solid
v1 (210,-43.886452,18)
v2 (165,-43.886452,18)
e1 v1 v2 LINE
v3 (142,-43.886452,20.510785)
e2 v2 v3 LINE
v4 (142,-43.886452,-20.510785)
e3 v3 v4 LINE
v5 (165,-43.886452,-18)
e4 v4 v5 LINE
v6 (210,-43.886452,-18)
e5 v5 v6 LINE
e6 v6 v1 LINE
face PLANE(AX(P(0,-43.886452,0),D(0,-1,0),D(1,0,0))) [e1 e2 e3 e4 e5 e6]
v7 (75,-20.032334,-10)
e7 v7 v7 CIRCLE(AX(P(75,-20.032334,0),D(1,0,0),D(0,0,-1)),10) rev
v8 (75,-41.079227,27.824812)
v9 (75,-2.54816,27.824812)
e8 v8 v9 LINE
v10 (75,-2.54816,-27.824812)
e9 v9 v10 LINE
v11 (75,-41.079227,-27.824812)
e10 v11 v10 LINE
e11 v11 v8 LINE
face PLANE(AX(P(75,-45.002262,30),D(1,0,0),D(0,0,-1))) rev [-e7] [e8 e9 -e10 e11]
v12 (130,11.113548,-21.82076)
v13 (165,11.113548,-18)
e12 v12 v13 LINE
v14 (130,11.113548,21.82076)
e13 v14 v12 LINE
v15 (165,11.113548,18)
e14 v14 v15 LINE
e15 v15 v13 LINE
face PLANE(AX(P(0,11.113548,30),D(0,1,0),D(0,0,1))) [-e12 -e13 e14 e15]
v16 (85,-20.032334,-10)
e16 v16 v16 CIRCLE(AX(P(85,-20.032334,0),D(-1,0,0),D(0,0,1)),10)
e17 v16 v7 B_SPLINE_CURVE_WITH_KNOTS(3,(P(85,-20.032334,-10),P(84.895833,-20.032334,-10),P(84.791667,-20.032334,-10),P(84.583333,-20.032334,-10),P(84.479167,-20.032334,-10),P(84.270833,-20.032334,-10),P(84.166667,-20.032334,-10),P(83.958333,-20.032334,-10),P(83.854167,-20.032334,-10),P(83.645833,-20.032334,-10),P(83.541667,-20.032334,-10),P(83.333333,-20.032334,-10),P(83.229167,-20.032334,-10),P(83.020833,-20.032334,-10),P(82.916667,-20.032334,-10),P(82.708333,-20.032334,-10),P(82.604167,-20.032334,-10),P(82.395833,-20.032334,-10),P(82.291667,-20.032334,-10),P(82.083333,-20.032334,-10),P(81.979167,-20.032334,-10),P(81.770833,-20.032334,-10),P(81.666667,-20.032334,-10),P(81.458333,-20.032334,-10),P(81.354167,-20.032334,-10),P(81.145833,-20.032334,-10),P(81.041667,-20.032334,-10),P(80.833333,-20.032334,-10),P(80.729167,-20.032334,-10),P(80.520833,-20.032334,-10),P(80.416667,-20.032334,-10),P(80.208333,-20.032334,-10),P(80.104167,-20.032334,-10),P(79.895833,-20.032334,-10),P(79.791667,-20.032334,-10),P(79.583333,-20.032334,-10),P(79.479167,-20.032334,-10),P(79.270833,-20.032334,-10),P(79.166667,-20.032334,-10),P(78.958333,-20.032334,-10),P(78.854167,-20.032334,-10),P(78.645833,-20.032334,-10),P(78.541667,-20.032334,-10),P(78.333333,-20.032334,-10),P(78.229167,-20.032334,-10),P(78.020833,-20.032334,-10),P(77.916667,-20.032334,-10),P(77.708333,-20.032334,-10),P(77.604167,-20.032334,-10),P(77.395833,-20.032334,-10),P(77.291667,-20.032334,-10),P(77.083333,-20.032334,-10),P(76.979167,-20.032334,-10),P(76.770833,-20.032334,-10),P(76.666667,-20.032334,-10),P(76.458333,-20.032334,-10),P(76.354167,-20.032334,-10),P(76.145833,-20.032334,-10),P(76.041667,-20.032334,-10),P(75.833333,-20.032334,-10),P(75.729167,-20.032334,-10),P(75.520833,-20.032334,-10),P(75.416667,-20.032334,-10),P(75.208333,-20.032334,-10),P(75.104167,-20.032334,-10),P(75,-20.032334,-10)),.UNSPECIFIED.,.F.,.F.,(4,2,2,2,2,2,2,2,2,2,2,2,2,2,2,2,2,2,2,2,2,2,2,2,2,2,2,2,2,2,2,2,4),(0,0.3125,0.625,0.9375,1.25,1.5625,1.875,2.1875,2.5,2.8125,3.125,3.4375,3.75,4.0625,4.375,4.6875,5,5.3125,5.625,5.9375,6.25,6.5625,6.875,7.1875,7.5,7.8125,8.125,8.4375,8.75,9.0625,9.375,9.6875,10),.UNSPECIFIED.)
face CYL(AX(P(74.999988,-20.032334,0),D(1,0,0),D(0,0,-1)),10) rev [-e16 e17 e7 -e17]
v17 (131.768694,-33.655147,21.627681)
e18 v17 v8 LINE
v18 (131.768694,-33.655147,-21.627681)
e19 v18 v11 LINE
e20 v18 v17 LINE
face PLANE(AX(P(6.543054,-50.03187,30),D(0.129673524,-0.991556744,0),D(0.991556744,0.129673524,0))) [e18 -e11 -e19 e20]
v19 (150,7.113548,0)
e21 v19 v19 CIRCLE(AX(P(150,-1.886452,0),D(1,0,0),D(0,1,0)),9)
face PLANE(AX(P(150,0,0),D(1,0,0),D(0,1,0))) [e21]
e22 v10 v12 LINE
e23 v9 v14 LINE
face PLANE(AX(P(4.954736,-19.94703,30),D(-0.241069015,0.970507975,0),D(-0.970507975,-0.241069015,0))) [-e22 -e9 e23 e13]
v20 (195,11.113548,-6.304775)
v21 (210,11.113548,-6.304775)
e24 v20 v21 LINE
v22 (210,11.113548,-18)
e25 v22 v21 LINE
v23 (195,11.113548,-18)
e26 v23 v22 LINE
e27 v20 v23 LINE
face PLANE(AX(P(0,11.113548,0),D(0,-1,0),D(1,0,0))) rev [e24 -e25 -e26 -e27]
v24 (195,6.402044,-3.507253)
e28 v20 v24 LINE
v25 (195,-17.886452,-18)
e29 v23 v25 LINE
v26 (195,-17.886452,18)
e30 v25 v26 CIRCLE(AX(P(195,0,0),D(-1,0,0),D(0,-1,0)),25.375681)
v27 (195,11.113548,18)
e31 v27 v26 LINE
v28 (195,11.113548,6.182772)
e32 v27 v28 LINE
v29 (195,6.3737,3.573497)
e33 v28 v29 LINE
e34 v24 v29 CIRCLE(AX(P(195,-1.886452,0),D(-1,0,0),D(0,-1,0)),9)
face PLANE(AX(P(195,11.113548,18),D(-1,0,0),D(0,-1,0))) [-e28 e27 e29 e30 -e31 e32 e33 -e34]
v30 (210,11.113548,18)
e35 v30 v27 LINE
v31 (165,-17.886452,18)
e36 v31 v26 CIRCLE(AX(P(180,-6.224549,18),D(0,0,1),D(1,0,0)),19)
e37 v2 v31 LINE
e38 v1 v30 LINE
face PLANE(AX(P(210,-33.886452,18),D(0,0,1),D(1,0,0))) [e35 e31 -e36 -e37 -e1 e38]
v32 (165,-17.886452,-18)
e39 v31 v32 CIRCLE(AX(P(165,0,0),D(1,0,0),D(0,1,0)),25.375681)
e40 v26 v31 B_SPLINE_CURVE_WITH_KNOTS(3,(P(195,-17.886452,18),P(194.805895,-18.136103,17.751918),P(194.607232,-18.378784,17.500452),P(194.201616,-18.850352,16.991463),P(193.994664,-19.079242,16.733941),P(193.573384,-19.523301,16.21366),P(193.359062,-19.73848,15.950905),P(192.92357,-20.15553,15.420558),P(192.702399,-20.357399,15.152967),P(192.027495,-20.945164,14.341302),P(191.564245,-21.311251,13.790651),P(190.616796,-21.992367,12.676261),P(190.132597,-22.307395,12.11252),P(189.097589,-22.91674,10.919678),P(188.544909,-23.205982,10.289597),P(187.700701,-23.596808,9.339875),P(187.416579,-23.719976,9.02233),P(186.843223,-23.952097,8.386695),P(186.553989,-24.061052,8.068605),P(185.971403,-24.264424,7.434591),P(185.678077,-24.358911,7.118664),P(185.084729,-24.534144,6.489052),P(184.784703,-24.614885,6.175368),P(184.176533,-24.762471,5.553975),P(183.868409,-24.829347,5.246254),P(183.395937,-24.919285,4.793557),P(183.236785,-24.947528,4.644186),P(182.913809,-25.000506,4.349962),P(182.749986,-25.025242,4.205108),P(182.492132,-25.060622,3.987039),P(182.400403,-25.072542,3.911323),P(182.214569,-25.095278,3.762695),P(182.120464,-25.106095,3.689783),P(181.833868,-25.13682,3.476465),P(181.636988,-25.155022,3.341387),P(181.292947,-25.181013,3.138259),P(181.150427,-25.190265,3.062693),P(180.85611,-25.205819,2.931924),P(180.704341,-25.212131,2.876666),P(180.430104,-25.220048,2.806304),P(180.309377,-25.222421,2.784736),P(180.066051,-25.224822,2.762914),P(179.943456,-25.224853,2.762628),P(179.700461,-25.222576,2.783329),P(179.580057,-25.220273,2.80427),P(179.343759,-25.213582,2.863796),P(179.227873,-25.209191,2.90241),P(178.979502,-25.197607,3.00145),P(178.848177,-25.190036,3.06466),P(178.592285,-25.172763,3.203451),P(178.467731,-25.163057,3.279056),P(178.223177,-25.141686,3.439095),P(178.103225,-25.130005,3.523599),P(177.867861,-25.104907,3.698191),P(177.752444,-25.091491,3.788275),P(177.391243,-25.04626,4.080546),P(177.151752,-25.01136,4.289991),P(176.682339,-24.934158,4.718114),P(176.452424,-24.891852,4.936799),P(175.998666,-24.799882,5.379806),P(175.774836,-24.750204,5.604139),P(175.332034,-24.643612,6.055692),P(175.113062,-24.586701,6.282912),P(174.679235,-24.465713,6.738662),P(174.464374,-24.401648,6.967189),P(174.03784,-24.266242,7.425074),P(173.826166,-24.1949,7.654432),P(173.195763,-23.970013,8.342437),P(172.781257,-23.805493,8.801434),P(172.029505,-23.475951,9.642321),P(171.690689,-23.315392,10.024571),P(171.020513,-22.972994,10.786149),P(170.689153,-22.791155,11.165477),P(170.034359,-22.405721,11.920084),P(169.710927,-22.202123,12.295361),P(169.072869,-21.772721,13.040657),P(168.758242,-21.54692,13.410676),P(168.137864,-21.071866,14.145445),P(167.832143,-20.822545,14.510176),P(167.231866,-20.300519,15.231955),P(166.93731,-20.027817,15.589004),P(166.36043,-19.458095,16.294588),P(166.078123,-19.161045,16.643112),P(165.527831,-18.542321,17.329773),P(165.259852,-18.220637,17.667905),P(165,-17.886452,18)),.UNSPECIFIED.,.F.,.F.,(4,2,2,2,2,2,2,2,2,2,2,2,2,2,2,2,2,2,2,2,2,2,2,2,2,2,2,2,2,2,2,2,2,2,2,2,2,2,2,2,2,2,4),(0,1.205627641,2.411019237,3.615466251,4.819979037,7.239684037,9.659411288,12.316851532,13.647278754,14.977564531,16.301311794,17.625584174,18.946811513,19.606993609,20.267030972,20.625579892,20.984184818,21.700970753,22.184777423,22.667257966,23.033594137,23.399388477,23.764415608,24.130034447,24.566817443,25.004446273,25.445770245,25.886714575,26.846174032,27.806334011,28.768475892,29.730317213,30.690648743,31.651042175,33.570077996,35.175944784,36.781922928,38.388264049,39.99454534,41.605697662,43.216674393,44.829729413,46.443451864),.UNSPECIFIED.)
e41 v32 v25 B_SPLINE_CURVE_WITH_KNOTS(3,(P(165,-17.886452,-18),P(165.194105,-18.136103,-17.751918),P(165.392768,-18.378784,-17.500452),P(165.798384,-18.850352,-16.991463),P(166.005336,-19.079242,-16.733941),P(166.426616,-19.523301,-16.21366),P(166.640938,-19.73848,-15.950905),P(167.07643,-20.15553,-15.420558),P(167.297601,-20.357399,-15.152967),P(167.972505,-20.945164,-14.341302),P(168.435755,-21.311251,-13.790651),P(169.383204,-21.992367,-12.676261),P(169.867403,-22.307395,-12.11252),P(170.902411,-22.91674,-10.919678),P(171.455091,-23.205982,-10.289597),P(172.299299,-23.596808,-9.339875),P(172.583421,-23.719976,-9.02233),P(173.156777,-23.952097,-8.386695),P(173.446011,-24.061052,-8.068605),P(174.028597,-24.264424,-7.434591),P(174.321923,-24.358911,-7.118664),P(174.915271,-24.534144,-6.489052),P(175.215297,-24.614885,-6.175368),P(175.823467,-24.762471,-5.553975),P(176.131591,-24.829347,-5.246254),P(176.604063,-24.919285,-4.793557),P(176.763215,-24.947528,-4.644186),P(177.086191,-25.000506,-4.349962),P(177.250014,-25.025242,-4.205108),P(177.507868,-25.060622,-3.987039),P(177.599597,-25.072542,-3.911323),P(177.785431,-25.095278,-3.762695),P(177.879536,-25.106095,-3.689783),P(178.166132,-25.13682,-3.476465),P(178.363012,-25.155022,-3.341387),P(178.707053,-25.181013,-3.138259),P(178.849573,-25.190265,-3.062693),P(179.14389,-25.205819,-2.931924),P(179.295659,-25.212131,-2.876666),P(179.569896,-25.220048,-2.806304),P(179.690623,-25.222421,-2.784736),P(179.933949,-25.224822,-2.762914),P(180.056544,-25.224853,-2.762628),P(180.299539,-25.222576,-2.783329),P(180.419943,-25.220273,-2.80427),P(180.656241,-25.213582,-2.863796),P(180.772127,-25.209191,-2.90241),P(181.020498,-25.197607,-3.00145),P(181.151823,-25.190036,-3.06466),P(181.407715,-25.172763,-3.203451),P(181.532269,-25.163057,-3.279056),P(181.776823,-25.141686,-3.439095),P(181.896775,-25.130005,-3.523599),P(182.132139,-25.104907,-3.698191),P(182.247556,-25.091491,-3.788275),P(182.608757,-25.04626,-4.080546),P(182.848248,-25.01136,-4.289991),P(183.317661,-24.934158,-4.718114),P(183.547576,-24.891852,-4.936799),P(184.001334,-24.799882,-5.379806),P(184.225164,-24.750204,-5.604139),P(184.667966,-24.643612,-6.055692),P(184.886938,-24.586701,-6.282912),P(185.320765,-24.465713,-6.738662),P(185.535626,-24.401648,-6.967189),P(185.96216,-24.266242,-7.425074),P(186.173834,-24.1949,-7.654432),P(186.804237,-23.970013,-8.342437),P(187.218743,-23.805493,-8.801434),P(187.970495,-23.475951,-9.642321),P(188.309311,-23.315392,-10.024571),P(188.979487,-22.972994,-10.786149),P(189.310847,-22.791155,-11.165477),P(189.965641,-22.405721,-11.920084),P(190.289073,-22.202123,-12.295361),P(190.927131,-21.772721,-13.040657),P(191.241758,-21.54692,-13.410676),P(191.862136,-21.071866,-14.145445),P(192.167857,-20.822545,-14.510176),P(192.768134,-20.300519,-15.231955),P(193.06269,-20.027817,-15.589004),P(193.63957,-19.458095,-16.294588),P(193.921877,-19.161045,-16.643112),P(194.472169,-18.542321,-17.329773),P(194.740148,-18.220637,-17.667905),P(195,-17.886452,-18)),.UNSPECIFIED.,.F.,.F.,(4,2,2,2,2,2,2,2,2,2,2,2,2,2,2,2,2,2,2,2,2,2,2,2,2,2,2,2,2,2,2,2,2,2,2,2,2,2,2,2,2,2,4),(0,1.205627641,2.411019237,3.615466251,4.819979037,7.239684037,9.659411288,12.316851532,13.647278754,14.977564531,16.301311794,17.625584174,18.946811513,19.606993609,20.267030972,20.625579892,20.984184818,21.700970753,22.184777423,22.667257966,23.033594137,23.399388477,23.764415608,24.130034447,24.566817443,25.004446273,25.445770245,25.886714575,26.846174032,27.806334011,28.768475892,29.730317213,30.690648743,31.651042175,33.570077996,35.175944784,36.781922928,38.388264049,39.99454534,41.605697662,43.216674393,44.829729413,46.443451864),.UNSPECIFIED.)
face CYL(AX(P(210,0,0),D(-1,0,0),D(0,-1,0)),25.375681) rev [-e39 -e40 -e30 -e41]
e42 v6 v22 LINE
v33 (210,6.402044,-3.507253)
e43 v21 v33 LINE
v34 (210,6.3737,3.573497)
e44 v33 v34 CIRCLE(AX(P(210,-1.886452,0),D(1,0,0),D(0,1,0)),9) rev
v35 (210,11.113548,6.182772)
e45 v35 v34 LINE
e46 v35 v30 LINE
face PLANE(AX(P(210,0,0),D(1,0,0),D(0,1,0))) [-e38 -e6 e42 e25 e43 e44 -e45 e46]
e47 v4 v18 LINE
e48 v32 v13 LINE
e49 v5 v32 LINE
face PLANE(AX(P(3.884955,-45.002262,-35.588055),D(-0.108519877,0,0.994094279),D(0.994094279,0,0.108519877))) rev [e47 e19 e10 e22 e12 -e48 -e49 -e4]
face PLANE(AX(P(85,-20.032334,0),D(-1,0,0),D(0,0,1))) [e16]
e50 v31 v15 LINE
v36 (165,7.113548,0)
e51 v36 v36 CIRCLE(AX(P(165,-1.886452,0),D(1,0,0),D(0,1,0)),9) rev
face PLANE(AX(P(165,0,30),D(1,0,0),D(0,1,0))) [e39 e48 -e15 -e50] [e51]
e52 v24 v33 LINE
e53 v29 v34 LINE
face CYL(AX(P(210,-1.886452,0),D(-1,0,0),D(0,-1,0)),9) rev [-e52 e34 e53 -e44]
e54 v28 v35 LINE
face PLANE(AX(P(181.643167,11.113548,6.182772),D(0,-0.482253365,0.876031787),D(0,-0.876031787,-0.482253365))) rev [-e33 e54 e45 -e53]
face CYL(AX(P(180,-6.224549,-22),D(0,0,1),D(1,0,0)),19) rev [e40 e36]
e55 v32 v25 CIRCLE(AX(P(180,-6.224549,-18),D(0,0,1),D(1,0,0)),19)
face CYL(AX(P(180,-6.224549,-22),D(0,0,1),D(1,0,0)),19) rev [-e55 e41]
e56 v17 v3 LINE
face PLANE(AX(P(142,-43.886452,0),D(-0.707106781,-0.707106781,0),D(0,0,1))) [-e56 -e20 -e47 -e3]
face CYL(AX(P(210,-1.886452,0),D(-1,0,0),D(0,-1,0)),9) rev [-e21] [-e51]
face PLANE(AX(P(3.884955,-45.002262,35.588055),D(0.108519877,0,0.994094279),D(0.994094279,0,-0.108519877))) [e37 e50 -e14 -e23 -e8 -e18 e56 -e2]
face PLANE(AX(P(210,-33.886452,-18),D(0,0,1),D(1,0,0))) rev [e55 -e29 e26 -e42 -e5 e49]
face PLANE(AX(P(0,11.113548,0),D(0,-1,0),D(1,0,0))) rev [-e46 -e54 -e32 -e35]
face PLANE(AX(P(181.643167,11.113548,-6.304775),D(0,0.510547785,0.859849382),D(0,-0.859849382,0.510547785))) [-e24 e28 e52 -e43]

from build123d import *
from OCP.BRepAlgoAPI import BRepAlgoAPI_Cut
from OCP.TopTools import TopTools_ListOfShape

# Parameters (mm, degrees)
SKETCH1_R               = 10
BOSS_EXTRUDE2_DEPTH     = 30
SKETCH4_R               = 10
CUT_EXTRUDE1_DEPTH      = 15
CHAMFER1_SIZE           = 20
CUT_EXTRUDE2_DEPTH      = 174.638139858
CUT_EXTRUDE2_DEPTH_BACK = 174.638139858
BOSS_EXTRUDE3_DEPTH     = 45
CUT_EXTRUDE3_DEPTH      = 198.547978004
CUT_EXTRUDE3_DEPTH_BACK = 15
SKETCH6_3_R             = 9
SKETCH8_W               = 15
SKETCH8_H               = 36
BOSS_EXTRUDE4_DEPTH     = 45.000002
SKETCH10_R              = 9
CUT_EXTRUDE4_DEPTH      = 198.547978004
BOSS_EXTRUDE5_DEPTH     = 10
CHAMFER2_SIZE           = 12
CUT_EXTRUDE5_DEPTH      = 40
CUT_EXTRUDE6_DEPTH      = 217.852953896
CUT_EXTRUDE6_DEPTH_BACK = 217.852953896
SKETCH14_W              = 100
SKETCH14_H              = 60
CUT_EXTRUDE7_DEPTH      = 145.655593904
CUT_EXTRUDE7_DEPTH_BACK = 10
SKETCH16_R              = 10
CUT_EXTRUDE8_DEPTH      = 15


# Some blends are built 0.0001 mm under size
with BuildPart() as part:
    # Sketch1 → Boss-Extrude2 (new, symmetric)
    # profile 1 of 3: a face of its own
    with BuildSketch(Plane.XY):
        Polygon((25, -10), (-4.997737685, -45.002262315), (-25, -25), (-25, 25), (25, 25), align=None)
        Circle(SKETCH1_R, mode=Mode.SUBTRACT)
    # profile 2 of 3: a face of its own
    with BuildSketch(Plane.XY):
        Polygon((45, -10), (25, -10), (-4.997737685, -45.002262315), (45.002262315, -45.002262315), (75, -41.079226753), (75, -2.548159698), align=None)
    # profile 3 of 3: a face of its own
    with BuildSketch(Plane.XY):
        Polygon((130, 11.113547523), (75, -2.548159698), (75, -41.079226753), (130, -33.886452477), (165, -33.886452477), (165, 11.113547523), align=None)
    extrude(amount=BOSS_EXTRUDE2_DEPTH, both=True)

    # Sketch4 → Cut-Extrude1 (cut, symmetric)
    with BuildSketch(Plane.XY):
        Polygon((25, -10), (-4.997737685, -45.002262315), (-25, -25), (-25, 25), (25, 25), align=None)
        Circle(SKETCH4_R, mode=Mode.SUBTRACT)
    extrude(amount=CUT_EXTRUDE1_DEPTH, both=True, mode=Mode.SUBTRACT)

    # Chamfer1
    chamfer1_edges = [part.edges().sort_by_distance(p)[0] for p in [
        (25, -10, -22.5),
        (25, -10, 22.5),
    ]]
    chamfer(chamfer1_edges, length=CHAMFER1_SIZE - 0.0001)  # a hair under: the kernel refuses the full size

    # Sketch5 → Cut-Extrude2 (cut, two sides: drawn at the far end of the back side and taken through both)
    with BuildSketch(Plane(origin=(0, 0, 0), x_dir=(1, 0, 0), z_dir=(0, 1, 0)).offset(-CUT_EXTRUDE2_DEPTH_BACK)):
        Polygon((165, -30), (165, -18), (55.074227224, -30), align=None)
        Polygon((165, 18), (165, 30), (55.074227224, 30), align=None)
    extrude(amount=CUT_EXTRUDE2_DEPTH + CUT_EXTRUDE2_DEPTH_BACK, mode=Mode.SUBTRACT)

    # Sketch6 → Boss-Extrude3 (add)
    with BuildSketch(Plane(origin=(165, 0, 0), x_dir=(0, 0, -1), z_dir=(1, 0, 0))):
        with BuildLine():
            Line((-18, -33.886452477), (18, -33.886452477))
            Line((18, -33.886452477), (18, -17.886452477))
            ThreePointArc((18, -17.886452477), (0, -25.375680921), (-18, -17.886452477))
            Line((-18, -17.886452477), (-18, -33.886452477))
        make_face()
    extrude(amount=BOSS_EXTRUDE3_DEPTH)

    # Sketch6<3> → Cut-Extrude3 (cut, two sides: drawn at the far end of the back side and taken through both)
    with BuildSketch(Plane(origin=(165, 0, 0), x_dir=(0, 0, -1), z_dir=(1, 0, 0)).offset(-CUT_EXTRUDE3_DEPTH_BACK)):
        with Locations(Location((0, -1.886452477, 0), (0, 0, 90))):
            Circle(SKETCH6_3_R)
    extrude(amount=CUT_EXTRUDE3_DEPTH + CUT_EXTRUDE3_DEPTH_BACK, mode=Mode.SUBTRACT)

    # Sketch8 → Boss-Extrude4 (add)
    with BuildSketch(Plane.XZ.offset(33.886452477)):
        with Locations((202.5, 0)):
            Rectangle(SKETCH8_W, SKETCH8_H)
    extrude(amount=-BOSS_EXTRUDE4_DEPTH)

    # Sketch10 → Cut-Extrude4 (cut, through all)
    with BuildSketch(Plane(origin=(165, 0, 0), x_dir=(0, 0, -1), z_dir=(1, 0, 0))):
        with Locations(Location((0, -1.886452477, 0), (0, 0, 90))):
            Circle(SKETCH10_R)
    extrude(amount=CUT_EXTRUDE4_DEPTH, mode=Mode.SUBTRACT)

    # Sketch11 → Boss-Extrude5 (add)
    with BuildSketch(Plane.XZ.offset(33.886452477)):
        Polygon((130, 21.82076004), (130, -21.82076004), (165, -18), (210, -18), (210, 18), (165, 18), align=None)
    extrude(amount=BOSS_EXTRUDE5_DEPTH)

    # Chamfer2
    # the kernel refuses this chamfer: 12 mm, written as the material it takes off along each edge
    with BuildSketch(Plane(origin=(130, -43.886452477, 52.680955896), x_dir=(0, 1, 0), z_dir=(0, 0, -1))) as chamfer2_piece_1_section:
        Polygon((CHAMFER2_SIZE, 0), (0, CHAMFER2_SIZE), (0, 0), align=None)
    chamfer2_piece_1 = extrude(amount=105.361911791, mode=Mode.PRIVATE)
    chamfer2_piece_1 = split(chamfer2_piece_1, bisect_by=Plane(origin=(128.714213423, -34.054604706, 52.680955896), z_dir=(0.1296735244167249, -0.9915567442488328, 0)), keep=Keep.TOP, mode=Mode.PRIVATE)
    add(chamfer2_piece_1, mode=Mode.SUBTRACT)

    # Sketch13 → Cut-Extrude5 (cut)
    with BuildSketch(Plane.XY.offset(18)):
        with BuildLine():
            Line((165, -17.886452477), (195, -17.886452477))
            ThreePointArc((195, -17.886452477), (180, -25.224548687), (165, -17.886452477))
        make_face()
    extrude(amount=-CUT_EXTRUDE5_DEPTH, mode=Mode.SUBTRACT)

    # Sketch14 → Cut-Extrude6 (cut, two sides: drawn at the far end of the back side and taken through both)
    with BuildSketch(Plane(origin=(0, 0, 0), x_dir=(1, 0, 0), z_dir=(0, 1, 0)).offset(-CUT_EXTRUDE6_DEPTH_BACK)):
        with Locations((25, 0)):
            Rectangle(SKETCH14_W, SKETCH14_H)
    extrude(amount=CUT_EXTRUDE6_DEPTH + CUT_EXTRUDE6_DEPTH_BACK, mode=Mode.SUBTRACT)

    # Sketch16 → Cut-Extrude7 (cut, two sides: drawn at the far end of the back side and taken through both)
    with BuildSketch(Plane.ZY.offset(-75).offset(-CUT_EXTRUDE7_DEPTH_BACK)):
        with Locations(Location((0, -20.03233432, 0), (0, 0, 180))):
            Circle(SKETCH16_R)
    extrude(amount=CUT_EXTRUDE7_DEPTH + CUT_EXTRUDE7_DEPTH_BACK, mode=Mode.SUBTRACT)


with BuildPart() as cut_extrude8_tool:
    # Sketch17 → Cut-Extrude8 (new body)
    with BuildSketch(Plane(origin=(210, 0, 0), x_dir=(0, 0, -1), z_dir=(1, 0, 0))):
        with BuildLine():
            Line((-6.182771984, 11.113547523), (-3.573497387, 6.373699848))
            ThreePointArc((-3.573497387, 6.373699848), (-0.036026842, 7.113475415), (3.507252904, 6.402044194))
            Line((3.507252904, 6.402044194), (6.304774933, 11.113547523))
            Line((6.304774933, 11.113547523), (-6.182771984, 11.113547523))
        make_face()
    extrude(amount=-CUT_EXTRUDE8_DEPTH)


with BuildPart() as part_1:
    add(part.part)

    # Cut-Extrude8: cut by cut_extrude8_tool, with a tolerance
    cut_extrude8_stock = TopTools_ListOfShape()
    cut_extrude8_stock.Append(part_1.part.wrapped)
    cut_extrude8_tools = TopTools_ListOfShape()
    cut_extrude8_tools.Append(cut_extrude8_tool.part.wrapped)
    cut_extrude8_cut = BRepAlgoAPI_Cut()
    cut_extrude8_cut.SetArguments(cut_extrude8_stock)
    cut_extrude8_cut.SetTools(cut_extrude8_tools)
    cut_extrude8_cut.SetFuzzyValue(0.00001)
    cut_extrude8_cut.Build()
    add(Compound.cast(cut_extrude8_cut.Shape()).solids(), mode=Mode.REPLACE)


solid = part_1.part
